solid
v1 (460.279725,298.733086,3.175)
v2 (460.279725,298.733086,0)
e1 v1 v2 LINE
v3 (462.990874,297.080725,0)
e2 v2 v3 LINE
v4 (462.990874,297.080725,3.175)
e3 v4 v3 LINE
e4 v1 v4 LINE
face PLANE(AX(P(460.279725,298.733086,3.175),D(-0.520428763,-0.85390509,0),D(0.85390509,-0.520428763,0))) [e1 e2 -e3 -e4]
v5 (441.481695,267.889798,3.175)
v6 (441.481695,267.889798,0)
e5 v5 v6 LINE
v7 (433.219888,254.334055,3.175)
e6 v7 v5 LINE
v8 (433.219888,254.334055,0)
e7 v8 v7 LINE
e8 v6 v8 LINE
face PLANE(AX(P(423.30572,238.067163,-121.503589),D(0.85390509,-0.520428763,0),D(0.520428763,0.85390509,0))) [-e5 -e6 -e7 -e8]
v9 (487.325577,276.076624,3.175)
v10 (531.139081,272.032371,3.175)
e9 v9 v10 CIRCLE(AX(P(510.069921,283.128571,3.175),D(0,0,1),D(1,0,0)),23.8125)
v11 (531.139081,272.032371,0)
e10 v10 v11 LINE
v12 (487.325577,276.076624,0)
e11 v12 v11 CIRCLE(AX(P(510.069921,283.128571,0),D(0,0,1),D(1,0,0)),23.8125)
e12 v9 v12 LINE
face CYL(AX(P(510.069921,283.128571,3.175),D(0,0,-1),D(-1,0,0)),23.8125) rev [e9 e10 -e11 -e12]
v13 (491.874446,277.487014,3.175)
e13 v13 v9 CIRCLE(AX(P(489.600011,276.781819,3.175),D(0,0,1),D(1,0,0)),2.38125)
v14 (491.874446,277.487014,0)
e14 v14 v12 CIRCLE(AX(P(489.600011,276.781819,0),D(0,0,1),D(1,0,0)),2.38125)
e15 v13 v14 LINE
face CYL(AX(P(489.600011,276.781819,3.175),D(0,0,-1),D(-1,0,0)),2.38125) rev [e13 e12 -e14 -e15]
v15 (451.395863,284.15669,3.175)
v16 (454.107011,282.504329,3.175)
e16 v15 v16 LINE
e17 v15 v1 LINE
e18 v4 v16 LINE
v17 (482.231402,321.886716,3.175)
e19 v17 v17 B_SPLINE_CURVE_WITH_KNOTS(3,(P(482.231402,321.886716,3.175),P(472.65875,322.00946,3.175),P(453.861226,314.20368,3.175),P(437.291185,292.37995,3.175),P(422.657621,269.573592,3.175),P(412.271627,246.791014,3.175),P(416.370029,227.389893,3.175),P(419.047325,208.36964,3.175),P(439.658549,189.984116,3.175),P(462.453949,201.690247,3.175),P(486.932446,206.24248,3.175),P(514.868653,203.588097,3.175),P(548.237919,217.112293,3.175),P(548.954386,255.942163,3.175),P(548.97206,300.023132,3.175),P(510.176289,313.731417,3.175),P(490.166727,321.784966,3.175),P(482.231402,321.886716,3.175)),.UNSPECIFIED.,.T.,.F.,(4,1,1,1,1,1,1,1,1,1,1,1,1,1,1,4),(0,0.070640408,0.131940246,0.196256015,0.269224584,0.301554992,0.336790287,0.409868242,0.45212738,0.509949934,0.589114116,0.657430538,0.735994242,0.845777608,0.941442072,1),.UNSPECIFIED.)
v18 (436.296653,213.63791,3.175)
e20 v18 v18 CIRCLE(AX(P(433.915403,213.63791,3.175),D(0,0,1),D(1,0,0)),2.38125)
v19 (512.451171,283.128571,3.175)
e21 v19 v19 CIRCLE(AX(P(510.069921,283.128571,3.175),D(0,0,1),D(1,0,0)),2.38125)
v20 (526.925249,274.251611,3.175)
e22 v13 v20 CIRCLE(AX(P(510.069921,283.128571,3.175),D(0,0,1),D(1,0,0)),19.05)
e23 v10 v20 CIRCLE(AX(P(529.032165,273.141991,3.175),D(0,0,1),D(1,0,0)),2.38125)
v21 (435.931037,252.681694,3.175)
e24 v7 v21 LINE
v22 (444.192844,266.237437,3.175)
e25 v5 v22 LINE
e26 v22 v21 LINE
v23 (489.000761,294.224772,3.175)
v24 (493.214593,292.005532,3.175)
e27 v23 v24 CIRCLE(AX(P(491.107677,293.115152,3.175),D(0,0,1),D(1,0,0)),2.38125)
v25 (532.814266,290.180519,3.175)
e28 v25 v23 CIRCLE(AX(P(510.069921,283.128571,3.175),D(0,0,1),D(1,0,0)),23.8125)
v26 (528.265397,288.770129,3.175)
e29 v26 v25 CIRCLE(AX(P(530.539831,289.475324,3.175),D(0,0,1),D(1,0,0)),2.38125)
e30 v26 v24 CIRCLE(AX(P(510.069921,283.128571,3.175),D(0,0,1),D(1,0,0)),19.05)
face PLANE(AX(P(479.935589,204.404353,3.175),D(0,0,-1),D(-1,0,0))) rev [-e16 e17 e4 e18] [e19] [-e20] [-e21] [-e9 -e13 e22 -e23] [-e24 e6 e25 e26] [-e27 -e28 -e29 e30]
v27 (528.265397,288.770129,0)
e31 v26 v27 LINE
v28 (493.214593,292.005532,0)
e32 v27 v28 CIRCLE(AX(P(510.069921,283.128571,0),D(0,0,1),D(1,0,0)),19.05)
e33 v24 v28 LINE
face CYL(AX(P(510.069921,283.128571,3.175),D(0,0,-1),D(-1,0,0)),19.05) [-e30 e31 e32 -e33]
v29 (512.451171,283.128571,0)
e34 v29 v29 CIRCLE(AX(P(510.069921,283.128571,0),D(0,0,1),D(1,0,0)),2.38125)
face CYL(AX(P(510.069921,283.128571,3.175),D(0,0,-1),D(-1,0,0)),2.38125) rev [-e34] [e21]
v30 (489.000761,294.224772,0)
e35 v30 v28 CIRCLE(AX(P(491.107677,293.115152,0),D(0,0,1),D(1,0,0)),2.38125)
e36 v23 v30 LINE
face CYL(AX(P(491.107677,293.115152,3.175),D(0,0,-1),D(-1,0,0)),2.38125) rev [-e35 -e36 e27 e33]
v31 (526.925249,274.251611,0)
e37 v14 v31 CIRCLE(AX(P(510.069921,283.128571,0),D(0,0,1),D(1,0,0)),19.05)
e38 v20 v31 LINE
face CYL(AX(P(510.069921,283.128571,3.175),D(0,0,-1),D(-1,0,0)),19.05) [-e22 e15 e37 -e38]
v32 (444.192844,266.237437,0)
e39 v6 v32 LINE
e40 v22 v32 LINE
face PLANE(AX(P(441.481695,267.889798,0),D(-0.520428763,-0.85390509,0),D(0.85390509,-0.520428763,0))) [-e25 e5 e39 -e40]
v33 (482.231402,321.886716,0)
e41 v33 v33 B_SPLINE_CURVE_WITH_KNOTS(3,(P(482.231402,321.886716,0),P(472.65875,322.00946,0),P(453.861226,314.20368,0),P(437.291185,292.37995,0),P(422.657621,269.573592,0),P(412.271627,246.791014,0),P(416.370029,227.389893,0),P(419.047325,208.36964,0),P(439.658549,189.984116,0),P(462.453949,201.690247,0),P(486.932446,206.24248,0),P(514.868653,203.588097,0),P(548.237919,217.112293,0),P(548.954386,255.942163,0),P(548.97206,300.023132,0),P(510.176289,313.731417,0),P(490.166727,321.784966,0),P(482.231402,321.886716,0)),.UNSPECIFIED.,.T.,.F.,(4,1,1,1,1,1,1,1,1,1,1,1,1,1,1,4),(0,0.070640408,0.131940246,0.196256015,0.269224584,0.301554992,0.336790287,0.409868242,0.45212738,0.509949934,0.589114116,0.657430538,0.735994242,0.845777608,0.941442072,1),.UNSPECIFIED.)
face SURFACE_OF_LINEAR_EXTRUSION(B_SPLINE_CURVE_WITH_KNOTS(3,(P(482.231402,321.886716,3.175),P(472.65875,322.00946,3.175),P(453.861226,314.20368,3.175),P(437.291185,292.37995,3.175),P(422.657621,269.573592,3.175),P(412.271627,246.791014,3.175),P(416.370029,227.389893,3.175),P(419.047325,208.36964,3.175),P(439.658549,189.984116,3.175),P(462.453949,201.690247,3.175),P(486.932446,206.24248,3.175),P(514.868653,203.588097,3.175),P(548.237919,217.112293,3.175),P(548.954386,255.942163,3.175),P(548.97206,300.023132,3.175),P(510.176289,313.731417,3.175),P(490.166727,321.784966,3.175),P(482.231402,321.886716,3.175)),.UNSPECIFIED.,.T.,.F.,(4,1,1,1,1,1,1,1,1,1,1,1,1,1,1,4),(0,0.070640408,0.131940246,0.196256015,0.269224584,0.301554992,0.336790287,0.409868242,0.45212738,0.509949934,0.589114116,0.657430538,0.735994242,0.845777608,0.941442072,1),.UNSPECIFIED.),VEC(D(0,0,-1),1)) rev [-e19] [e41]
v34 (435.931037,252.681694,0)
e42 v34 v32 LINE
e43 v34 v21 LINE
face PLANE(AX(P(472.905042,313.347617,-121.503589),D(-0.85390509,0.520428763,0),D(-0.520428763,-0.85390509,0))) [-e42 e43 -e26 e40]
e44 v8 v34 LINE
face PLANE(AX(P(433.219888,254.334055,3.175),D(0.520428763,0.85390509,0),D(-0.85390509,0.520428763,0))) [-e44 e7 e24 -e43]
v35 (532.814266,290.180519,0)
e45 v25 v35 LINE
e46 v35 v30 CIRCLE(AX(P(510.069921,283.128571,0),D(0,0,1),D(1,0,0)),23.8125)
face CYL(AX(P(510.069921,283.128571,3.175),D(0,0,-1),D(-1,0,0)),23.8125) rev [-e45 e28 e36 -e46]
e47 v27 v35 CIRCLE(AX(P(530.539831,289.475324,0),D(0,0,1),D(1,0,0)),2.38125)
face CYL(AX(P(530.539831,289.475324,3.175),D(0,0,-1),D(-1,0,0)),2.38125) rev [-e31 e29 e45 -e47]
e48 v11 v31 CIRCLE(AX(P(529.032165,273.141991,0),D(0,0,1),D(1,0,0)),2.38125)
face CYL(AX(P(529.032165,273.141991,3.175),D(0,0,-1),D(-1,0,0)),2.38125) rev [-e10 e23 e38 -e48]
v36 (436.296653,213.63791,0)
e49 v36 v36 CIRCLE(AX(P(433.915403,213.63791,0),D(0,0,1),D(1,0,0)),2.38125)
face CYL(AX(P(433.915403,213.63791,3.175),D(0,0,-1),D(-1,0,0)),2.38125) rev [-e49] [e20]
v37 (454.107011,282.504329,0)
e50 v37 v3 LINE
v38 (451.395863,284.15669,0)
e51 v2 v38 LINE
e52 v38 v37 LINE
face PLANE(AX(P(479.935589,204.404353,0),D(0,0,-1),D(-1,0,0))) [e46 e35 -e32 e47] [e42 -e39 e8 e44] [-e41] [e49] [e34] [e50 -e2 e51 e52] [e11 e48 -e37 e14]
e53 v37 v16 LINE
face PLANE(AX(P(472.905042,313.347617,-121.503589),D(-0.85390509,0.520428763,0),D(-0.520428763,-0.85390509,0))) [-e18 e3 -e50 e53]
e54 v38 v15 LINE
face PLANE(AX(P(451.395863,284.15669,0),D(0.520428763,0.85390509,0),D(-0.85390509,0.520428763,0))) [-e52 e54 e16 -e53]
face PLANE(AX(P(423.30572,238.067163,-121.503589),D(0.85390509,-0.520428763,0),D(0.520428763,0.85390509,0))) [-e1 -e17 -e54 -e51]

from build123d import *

# Parameters (mm, degrees)
SKETCH1_R           = 2.38125
BOSS_EXTRUDE1_DEPTH = 3.175
CAVITY1_START       = 477.562234694
CAVITY1_OUTLINE_W   = 3.175
CAVITY1_OUTLINE_H   = 3.175
CAVITY1_DEPTH       = 17.070276129
CAVITY1_START_2     = 442.637234694
CAVITY1_2_OUTLINE_W = 3.175
CAVITY1_2_OUTLINE_H = 3.175
CAVITY1_2_DEPTH     = 15.875


# Read off the part's stored shape, not the designer's step: Cavity1
with BuildPart() as part:
    # Sketch1 → Boss-Extrude1 (new body)
    with BuildSketch(Plane.XY):
        with BuildLine():
            add(Edge.make_bspline(
                [(482.231401624, 321.88671593), (472.658750451, 322.009460208), (453.861225957, 314.203680081), (437.291185004, 292.379949666), (422.657620839, 269.573592211), (412.271626808, 246.791013667), (416.37002894, 227.389892698), (419.047324784, 208.369640308), (439.658548571, 189.984116417), (462.453949218, 201.69024677), (486.932445726, 206.242479607), (514.868653349, 203.588097311), (548.237919328, 217.112293197), (548.954385958, 255.942162896), (548.972060183, 300.023132225), (510.176288855, 313.731416792), (490.16672689, 321.784966085), (482.231401624, 321.88671593)],
                knots=[0, 0, 0, 0, 0.070640408, 0.131940246, 0.196256015, 0.269224584, 0.301554992, 0.336790287, 0.409868242, 0.45212738, 0.509949934, 0.589114116, 0.657430538, 0.735994242, 0.845777608, 0.941442072, 1, 1, 1, 1], degree=3))
        make_face()
        with Locations((433.915403324, 213.637909992)):
            Circle(SKETCH1_R, mode=Mode.SUBTRACT)
        with Locations((510.069921301, 283.128571476)):
            Circle(SKETCH1_R, mode=Mode.SUBTRACT)
        with BuildLine():
            ThreePointArc((532.81426555, 290.180518791), (512.258655236, 306.840269011), (489.000761481, 294.224771761))
            ThreePointArc((489.000761481, 294.224771761), (489.998057435, 291.00823575), (493.214593445, 292.005531704))
            ThreePointArc((493.214593445, 292.005531704), (511.820908449, 302.097929504), (528.2653967, 288.770129328))
            ThreePointArc((528.2653967, 288.770129328), (531.245025856, 287.200889635), (532.81426555, 290.180518791))
        make_face(mode=Mode.SUBTRACT)
        with BuildLine():
            ThreePointArc((487.325577052, 276.076624161), (507.881187366, 259.41687394), (531.13908112, 272.032371191))
            ThreePointArc((531.13908112, 272.032371191), (530.141785166, 275.248907201), (526.925249156, 274.251611248))
            ThreePointArc((526.925249156, 274.251611248), (508.318934153, 264.159213448), (491.874445902, 277.487013624))
            ThreePointArc((491.874445902, 277.487013624), (488.894816745, 279.056253317), (487.325577052, 276.076624161))
        make_face(mode=Mode.SUBTRACT)
    extrude(amount=BOSS_EXTRUDE1_DEPTH)

    # Cavity1 outline → Cavity1 (cut)
    with BuildSketch(Plane(origin=(0, 0, 0), x_dir=(0.8539050898948394, -0.5204287630902872, 0), z_dir=(0.5204287630902872, 0.8539050898948394, 0)).offset(CAVITY1_START)):
        with Locations((239.153409968, -1.5875)):
            Rectangle(CAVITY1_OUTLINE_W, CAVITY1_OUTLINE_H)
    extrude(amount=CAVITY1_DEPTH, mode=Mode.SUBTRACT)

    # Cavity1 2 outline → Cavity1 2 (cut)
    with BuildSketch(Plane(origin=(0, 0, 0), x_dir=(0.8539050898948394, -0.5204287630902872, 0), z_dir=(0.5204287630902872, 0.8539050898948394, 0)).offset(CAVITY1_START_2)):
        with Locations((239.153409968, -1.5875)):
            Rectangle(CAVITY1_2_OUTLINE_W, CAVITY1_2_OUTLINE_H)
    extrude(amount=CAVITY1_2_DEPTH, mode=Mode.SUBTRACT)


solid = part.part
